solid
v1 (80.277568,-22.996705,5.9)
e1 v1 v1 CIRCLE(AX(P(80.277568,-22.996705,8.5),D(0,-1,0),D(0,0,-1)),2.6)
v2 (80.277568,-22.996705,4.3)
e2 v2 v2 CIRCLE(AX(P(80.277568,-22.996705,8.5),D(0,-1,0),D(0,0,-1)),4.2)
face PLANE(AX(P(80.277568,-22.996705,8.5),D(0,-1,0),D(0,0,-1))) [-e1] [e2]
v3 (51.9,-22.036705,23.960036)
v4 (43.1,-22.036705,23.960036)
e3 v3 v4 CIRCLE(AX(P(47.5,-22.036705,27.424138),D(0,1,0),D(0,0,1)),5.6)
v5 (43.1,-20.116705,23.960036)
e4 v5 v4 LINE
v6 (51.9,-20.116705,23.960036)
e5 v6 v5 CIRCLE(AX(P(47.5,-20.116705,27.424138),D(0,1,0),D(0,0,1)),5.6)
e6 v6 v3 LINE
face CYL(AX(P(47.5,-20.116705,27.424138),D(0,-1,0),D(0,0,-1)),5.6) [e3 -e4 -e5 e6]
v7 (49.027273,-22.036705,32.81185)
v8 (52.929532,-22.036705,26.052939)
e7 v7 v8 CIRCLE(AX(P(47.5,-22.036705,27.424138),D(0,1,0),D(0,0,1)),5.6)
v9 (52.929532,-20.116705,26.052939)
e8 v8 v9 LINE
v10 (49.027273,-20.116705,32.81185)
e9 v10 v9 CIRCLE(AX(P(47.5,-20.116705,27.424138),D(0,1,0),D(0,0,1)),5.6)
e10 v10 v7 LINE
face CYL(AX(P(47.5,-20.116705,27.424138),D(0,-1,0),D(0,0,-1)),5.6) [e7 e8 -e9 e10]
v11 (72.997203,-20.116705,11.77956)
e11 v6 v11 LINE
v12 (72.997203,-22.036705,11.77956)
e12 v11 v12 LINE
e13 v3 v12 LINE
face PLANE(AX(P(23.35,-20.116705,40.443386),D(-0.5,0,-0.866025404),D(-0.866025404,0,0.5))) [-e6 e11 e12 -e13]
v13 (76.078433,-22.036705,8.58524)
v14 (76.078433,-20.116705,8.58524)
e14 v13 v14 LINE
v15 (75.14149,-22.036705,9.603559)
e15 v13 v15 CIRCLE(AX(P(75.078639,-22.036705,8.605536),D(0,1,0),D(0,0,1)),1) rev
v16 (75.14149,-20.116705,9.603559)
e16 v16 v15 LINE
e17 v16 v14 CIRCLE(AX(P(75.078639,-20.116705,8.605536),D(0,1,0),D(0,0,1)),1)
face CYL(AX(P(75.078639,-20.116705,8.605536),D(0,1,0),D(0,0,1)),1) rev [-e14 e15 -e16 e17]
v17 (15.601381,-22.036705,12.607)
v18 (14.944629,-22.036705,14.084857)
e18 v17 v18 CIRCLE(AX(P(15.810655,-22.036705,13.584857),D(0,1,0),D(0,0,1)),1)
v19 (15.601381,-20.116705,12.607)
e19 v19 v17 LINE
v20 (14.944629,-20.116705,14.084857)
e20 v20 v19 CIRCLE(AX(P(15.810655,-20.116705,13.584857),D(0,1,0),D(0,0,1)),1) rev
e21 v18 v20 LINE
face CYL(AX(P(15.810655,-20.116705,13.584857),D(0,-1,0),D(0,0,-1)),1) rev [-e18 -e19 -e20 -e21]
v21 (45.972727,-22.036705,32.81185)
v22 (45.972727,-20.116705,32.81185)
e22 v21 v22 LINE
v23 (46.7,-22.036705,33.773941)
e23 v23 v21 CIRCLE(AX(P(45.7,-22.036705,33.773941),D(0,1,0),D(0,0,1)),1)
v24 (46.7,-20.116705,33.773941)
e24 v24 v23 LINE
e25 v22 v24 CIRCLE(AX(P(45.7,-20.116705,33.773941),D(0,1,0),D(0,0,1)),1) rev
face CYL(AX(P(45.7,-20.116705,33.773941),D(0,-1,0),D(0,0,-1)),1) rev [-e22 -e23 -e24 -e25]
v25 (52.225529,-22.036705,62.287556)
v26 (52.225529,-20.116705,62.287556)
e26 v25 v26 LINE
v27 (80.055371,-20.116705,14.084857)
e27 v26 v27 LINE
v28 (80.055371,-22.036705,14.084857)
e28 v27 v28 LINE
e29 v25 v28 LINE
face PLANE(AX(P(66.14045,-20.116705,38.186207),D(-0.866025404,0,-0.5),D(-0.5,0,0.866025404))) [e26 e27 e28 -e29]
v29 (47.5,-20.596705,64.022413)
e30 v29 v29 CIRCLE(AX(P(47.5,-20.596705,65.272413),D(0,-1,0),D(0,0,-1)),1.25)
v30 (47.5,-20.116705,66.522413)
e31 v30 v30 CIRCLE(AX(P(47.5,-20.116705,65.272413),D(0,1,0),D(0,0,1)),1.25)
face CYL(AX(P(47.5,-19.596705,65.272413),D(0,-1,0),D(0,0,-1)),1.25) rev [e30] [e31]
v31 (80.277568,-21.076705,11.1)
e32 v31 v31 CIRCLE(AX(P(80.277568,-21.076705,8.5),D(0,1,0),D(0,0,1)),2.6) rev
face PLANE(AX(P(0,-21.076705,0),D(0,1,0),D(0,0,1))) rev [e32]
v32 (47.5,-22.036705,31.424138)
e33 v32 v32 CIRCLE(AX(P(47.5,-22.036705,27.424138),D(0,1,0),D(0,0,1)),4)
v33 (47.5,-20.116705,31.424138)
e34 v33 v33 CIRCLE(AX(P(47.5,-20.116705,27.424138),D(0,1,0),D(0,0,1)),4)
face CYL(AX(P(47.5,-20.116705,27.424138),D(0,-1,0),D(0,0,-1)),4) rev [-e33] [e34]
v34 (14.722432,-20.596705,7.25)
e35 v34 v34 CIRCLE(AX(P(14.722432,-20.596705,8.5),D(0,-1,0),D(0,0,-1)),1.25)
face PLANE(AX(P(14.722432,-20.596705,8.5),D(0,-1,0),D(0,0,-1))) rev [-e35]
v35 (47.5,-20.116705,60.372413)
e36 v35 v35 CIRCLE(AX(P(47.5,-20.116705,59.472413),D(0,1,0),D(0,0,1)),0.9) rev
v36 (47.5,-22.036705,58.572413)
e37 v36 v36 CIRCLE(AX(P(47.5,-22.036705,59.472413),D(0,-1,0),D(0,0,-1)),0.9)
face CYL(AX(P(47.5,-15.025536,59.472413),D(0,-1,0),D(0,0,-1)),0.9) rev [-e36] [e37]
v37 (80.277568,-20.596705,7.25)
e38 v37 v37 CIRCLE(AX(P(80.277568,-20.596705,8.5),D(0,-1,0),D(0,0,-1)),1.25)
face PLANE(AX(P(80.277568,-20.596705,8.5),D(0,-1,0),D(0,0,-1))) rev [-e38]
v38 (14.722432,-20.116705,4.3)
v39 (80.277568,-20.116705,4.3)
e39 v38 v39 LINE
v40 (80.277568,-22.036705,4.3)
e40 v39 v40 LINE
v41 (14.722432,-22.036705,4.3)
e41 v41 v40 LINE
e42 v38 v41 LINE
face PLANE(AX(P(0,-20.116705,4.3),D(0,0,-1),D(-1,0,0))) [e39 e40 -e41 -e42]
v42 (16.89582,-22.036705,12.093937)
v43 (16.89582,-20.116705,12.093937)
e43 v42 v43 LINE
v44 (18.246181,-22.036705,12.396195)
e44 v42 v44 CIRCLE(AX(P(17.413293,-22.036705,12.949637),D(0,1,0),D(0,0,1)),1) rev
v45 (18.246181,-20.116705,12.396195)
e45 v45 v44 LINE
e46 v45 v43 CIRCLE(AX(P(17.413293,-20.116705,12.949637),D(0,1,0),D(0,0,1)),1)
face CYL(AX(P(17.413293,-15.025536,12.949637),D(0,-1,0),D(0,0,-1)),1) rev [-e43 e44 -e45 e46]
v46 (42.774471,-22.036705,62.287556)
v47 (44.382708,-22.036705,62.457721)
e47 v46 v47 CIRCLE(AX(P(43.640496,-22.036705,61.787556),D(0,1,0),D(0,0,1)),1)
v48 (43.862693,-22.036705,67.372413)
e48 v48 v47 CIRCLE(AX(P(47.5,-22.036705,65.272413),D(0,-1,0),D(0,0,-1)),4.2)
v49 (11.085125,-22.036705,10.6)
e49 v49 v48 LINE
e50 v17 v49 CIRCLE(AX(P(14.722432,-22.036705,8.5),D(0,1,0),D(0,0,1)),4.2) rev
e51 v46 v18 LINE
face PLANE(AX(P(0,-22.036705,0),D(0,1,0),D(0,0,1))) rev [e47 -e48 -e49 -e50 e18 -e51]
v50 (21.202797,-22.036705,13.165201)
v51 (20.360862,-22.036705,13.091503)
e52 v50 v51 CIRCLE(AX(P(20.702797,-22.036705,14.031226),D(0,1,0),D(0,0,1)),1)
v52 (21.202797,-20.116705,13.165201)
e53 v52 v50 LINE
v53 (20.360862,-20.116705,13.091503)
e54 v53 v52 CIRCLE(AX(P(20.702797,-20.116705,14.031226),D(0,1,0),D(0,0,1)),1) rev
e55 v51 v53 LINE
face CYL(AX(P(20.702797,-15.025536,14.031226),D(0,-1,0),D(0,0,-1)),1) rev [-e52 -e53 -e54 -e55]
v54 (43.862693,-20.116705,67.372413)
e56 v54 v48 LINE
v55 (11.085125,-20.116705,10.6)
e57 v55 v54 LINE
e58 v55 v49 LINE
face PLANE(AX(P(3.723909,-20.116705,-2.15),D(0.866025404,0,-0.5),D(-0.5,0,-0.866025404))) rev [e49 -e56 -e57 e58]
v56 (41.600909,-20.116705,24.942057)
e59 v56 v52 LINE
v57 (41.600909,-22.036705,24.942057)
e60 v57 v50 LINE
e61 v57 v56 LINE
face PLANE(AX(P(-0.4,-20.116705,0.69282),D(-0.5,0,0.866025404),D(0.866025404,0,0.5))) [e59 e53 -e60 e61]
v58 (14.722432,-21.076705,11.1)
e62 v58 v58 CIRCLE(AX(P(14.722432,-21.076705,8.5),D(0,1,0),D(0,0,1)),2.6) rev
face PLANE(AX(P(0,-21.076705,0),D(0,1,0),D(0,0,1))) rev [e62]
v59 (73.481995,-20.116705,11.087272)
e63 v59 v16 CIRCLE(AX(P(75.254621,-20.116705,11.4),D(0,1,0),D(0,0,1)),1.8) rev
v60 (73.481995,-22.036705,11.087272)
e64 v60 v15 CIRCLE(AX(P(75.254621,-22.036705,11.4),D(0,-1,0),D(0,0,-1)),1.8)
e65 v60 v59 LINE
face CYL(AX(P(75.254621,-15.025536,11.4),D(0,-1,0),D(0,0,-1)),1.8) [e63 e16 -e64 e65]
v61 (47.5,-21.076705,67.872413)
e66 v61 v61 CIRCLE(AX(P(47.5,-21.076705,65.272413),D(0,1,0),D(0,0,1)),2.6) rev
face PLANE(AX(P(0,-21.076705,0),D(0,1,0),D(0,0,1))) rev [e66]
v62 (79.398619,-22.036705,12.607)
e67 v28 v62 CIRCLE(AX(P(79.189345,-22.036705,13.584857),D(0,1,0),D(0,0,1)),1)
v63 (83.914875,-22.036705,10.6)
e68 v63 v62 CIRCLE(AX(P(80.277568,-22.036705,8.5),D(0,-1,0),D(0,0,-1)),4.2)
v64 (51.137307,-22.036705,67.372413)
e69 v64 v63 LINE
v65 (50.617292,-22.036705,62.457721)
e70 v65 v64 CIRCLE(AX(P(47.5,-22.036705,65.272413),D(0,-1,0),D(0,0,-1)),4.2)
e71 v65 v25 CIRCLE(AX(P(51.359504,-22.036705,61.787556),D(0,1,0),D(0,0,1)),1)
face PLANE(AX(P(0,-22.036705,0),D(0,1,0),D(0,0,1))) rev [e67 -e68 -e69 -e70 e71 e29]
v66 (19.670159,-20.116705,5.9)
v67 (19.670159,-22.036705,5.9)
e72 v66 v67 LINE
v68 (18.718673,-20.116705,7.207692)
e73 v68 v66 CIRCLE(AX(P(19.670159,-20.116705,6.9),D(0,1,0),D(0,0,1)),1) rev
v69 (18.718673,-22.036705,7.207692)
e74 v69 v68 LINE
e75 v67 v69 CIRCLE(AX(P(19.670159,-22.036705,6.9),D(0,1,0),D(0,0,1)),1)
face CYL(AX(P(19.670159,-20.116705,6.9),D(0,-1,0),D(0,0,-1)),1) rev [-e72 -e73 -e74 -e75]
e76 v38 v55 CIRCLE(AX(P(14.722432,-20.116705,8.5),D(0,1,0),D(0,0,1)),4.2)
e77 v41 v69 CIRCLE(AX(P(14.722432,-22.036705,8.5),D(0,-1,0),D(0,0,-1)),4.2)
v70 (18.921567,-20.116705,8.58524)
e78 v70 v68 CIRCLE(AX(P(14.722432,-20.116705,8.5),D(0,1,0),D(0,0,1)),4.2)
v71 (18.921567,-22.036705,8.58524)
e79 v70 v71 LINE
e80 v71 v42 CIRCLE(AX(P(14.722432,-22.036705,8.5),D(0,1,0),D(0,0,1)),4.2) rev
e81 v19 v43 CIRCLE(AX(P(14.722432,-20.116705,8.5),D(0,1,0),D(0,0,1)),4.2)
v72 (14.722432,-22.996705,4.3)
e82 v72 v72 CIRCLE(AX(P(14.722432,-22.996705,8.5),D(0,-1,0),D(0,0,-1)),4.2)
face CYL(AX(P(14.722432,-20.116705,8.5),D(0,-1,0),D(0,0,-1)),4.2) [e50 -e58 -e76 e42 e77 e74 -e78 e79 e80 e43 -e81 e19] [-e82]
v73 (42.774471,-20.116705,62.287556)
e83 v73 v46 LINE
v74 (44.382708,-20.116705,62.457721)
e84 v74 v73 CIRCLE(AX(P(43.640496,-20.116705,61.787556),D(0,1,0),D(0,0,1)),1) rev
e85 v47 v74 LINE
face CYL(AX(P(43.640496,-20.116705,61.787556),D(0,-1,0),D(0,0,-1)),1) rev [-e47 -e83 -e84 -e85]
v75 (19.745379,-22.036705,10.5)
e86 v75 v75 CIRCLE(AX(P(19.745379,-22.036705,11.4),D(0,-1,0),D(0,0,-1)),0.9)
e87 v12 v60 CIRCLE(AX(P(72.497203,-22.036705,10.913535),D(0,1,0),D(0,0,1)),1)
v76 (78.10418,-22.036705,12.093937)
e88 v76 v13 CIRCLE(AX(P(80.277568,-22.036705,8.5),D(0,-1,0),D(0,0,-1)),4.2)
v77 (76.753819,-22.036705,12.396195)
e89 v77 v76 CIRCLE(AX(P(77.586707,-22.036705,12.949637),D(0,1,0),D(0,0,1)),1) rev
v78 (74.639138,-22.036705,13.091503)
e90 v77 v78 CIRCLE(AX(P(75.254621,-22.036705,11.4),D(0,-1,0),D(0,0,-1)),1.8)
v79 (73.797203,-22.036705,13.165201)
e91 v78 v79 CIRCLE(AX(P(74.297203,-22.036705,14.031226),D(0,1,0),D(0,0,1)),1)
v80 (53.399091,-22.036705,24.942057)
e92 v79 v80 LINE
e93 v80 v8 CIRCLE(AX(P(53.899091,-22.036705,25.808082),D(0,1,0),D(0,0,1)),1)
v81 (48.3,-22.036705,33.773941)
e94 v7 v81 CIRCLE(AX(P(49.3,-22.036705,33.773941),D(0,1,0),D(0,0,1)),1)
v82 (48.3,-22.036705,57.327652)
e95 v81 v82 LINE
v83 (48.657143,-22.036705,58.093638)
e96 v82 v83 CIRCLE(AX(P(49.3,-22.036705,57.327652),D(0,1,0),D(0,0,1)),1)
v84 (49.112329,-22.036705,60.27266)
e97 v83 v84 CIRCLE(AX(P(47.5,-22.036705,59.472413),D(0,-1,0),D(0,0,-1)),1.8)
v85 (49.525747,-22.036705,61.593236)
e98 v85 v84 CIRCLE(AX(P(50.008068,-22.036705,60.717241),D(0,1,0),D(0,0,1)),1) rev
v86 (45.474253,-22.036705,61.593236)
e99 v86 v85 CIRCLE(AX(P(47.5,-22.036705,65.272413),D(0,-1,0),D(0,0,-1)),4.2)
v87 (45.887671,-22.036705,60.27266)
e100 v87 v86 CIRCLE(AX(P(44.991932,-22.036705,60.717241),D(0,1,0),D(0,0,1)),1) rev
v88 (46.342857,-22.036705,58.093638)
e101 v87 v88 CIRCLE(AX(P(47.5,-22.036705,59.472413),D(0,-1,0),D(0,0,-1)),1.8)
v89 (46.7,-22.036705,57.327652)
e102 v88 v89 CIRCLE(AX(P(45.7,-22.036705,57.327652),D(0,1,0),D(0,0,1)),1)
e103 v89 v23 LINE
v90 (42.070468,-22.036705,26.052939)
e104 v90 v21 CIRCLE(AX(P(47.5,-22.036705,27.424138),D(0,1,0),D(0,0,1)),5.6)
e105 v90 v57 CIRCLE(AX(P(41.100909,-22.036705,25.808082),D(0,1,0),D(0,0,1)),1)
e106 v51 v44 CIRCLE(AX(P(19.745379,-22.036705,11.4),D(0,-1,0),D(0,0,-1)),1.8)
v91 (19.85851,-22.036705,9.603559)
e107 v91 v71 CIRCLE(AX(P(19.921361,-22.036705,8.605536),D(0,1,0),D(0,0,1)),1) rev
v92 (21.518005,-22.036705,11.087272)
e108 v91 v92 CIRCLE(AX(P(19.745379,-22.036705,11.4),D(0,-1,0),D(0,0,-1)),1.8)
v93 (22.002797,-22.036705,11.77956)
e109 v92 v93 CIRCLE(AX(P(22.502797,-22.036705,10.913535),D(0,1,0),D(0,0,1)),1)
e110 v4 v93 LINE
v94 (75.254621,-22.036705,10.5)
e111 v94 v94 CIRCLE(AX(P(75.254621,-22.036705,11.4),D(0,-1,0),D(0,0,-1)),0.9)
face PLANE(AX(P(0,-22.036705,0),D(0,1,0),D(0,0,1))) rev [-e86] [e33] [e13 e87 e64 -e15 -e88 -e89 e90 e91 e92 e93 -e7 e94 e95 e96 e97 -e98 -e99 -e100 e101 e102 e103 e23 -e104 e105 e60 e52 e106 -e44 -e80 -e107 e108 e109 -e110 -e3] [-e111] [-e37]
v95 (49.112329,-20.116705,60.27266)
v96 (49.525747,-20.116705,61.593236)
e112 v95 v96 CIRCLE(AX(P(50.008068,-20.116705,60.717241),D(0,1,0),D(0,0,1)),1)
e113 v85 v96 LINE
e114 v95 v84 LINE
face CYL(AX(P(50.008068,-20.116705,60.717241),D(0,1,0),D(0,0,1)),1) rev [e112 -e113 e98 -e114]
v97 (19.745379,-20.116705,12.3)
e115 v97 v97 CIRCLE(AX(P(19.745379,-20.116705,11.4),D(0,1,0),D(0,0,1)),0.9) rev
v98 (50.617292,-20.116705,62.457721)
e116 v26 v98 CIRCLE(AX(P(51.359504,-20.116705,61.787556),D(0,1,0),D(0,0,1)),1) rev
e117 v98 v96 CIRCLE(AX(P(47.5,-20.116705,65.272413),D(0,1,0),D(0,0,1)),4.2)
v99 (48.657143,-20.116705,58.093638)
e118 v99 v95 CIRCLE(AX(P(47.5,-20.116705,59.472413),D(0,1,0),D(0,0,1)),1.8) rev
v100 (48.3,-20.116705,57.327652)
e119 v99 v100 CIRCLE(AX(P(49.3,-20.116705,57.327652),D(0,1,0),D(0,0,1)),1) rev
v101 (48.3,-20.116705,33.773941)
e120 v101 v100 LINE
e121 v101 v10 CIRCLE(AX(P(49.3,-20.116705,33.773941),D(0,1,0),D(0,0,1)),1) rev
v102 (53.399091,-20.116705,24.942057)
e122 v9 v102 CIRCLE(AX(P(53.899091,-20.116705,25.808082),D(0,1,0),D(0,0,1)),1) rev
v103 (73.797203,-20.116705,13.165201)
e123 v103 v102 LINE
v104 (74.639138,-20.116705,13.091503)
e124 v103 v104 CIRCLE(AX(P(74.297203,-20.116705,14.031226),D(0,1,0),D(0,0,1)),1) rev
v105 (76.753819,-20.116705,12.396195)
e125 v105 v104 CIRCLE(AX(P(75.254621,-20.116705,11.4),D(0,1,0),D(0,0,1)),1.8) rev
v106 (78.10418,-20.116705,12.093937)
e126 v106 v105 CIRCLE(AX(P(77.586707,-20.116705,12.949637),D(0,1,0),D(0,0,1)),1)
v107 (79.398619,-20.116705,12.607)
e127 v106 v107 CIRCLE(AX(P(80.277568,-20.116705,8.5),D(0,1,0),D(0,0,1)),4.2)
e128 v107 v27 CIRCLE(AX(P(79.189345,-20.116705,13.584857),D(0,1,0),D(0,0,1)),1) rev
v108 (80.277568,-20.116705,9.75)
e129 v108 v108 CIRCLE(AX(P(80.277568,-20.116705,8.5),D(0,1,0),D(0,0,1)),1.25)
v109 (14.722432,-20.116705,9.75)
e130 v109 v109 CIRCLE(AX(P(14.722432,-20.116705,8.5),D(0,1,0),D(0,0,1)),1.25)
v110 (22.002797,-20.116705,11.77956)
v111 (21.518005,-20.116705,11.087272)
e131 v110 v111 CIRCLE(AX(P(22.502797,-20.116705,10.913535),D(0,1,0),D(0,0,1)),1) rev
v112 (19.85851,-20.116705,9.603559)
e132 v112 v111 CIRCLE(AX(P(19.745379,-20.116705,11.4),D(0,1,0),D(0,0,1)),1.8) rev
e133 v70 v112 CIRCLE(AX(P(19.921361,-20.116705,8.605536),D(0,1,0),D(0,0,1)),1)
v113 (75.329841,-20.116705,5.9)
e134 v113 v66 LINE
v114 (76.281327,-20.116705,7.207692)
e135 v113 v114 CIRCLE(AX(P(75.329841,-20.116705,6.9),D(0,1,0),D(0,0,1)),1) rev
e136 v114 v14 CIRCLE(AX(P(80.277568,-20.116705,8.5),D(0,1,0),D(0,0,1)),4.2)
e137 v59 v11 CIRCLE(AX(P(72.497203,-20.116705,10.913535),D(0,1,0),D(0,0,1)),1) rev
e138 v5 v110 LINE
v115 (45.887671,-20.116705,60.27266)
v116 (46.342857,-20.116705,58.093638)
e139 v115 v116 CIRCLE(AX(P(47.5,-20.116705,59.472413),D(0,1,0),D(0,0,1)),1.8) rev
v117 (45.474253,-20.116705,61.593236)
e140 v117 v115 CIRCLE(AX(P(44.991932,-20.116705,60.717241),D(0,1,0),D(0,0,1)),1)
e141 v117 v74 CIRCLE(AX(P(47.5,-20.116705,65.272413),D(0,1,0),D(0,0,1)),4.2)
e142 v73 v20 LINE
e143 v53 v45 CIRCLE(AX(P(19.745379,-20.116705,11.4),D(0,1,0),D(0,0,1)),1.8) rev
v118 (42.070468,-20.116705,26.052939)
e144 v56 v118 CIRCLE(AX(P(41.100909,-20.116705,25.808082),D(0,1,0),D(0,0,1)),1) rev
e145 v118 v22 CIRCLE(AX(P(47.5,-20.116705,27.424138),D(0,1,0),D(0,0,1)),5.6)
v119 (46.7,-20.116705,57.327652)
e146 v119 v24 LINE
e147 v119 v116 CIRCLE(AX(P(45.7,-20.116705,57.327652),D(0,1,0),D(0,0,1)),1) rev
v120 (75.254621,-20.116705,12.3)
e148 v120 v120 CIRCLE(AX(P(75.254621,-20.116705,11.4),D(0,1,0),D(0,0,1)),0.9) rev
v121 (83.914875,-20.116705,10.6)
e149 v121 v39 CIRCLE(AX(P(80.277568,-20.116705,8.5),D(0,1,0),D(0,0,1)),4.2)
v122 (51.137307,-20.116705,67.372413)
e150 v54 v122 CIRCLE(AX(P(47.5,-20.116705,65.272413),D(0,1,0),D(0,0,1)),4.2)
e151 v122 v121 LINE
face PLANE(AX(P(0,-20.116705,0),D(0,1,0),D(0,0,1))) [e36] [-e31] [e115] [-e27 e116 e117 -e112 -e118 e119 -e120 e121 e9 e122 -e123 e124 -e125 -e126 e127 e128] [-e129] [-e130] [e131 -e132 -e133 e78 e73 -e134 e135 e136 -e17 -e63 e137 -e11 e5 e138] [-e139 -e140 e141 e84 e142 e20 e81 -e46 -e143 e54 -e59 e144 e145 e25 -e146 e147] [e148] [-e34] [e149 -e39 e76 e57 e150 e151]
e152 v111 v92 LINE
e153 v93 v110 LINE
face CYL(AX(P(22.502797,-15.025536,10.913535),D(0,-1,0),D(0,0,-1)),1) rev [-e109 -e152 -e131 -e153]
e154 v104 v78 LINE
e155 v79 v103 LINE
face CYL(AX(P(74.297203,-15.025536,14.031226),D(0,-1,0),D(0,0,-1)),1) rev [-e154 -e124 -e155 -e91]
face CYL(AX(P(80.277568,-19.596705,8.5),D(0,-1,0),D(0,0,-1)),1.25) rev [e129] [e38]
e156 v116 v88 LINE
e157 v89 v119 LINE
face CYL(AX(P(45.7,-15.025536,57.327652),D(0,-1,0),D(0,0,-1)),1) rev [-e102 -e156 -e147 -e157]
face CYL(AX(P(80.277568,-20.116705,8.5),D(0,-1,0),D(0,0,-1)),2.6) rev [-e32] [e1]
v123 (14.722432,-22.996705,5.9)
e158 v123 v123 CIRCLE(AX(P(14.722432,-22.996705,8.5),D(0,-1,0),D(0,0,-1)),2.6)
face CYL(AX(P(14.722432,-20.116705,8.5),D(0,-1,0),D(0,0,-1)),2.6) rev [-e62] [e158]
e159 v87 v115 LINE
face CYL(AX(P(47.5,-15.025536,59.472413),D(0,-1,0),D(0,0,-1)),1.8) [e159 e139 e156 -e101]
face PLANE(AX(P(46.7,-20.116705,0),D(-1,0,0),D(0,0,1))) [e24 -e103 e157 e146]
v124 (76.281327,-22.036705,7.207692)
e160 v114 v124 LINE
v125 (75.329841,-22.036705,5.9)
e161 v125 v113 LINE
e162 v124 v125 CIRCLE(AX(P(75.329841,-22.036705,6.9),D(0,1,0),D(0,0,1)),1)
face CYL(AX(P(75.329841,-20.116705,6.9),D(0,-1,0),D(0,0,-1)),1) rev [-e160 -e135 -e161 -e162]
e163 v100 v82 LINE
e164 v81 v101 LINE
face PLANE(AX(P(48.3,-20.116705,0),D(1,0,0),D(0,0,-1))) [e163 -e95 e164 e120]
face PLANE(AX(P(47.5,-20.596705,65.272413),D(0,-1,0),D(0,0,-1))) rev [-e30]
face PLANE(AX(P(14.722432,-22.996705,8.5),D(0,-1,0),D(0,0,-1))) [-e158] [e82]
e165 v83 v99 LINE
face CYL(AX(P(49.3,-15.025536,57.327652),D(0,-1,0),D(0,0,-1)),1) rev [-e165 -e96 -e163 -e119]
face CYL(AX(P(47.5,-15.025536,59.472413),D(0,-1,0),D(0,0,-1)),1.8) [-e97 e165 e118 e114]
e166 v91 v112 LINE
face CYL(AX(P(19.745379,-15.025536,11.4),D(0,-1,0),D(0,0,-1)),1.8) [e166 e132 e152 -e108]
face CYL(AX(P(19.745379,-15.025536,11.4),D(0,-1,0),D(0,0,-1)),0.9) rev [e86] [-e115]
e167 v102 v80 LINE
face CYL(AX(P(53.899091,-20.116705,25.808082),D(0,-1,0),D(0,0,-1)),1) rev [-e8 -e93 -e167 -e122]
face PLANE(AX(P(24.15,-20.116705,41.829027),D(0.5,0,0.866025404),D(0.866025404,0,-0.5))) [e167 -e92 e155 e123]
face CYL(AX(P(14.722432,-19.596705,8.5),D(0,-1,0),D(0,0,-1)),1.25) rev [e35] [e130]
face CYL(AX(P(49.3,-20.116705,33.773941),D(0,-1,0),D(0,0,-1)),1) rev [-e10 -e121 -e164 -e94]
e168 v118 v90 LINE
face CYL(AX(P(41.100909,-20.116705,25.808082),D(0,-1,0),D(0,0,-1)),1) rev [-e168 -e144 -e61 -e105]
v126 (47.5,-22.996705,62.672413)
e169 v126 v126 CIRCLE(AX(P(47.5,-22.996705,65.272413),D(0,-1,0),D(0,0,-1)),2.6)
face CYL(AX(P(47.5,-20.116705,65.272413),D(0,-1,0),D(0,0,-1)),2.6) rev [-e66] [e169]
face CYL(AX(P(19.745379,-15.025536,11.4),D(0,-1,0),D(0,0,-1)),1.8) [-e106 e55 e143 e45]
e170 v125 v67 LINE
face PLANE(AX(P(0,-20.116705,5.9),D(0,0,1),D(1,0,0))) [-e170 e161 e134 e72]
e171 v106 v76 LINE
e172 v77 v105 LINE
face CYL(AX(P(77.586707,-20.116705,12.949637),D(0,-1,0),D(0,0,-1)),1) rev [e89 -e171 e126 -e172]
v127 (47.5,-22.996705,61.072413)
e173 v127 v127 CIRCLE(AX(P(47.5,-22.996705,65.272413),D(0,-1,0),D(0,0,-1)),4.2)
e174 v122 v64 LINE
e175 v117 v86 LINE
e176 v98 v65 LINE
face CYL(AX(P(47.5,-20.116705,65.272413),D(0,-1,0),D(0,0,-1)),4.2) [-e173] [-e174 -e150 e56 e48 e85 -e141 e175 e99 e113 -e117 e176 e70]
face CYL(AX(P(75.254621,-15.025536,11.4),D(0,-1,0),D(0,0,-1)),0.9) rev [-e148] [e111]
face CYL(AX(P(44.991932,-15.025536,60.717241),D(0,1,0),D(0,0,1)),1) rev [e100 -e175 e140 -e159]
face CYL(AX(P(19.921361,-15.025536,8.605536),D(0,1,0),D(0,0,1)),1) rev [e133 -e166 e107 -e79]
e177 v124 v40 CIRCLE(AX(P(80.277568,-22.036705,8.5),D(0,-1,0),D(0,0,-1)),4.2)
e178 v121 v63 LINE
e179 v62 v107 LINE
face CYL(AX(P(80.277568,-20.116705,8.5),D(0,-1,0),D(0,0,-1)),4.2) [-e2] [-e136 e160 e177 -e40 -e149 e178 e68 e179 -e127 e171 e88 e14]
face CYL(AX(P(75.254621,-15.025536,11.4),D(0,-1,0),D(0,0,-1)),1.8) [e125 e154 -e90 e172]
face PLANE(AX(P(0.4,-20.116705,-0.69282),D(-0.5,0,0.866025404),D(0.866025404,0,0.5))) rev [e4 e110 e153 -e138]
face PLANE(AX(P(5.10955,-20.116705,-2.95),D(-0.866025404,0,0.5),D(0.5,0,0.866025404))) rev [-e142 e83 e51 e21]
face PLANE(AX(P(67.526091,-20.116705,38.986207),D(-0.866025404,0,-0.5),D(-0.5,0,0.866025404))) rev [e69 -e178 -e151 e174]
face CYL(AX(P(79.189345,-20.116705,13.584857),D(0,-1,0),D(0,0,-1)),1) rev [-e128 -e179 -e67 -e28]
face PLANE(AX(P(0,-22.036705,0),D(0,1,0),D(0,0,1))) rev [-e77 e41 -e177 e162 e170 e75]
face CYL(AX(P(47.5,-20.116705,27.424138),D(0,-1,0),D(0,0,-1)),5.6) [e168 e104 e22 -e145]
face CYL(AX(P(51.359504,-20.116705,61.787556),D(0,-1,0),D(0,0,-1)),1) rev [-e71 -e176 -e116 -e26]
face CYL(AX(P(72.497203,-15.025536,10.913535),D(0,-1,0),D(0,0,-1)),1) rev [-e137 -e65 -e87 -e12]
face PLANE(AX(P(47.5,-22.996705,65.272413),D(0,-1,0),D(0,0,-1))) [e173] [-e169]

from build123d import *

# Parameters (mm, degrees)
SKETCH6_R           = 2.6
SKETCH6_R_2         = 4
BOSS_EXTRUDE4_DEPTH = 1.92
BOSS_EXTRUDE5_START = -0.96
SKETCH7_R           = 2.6
BOSS_EXTRUDE5_DEPTH = 0.96
BOSS_EXTRUDE6_START = 0.96
SKETCH8_R           = 4.2
SKETCH8_R_2         = 2.6
BOSS_EXTRUDE6_DEPTH = 0.96
CUT_EXTRUDE1_START  = -0.48
SKETCH9_R           = 1.25
CUT_EXTRUDE1_DEPTH  = 1
SKETCH15_R          = 1.8
SKETCH15_R_2        = 0.9
BOSS_EXTRUDE9_DEPTH = 1.92
SKETCH16_R          = 0.9
CUT_EXTRUDE2_DEPTH  = 110.391782763
FILLET4_R           = 1
FILLET5_R           = 1
FILLET6_R           = 1
FILLET7_R           = 1
FILLET8_R           = 1
FILLET9_R           = 1
FILLET10_R          = 1


with BuildPart() as part:
    # Sketch6 → Boss-Extrude4 (new body)
    with BuildSketch(Plane(origin=(6.205374015, -22.036704958, -3.582674358), x_dir=(-0.6546536707079775, 0, -0.7559289460184543), z_dir=(0, 1, 0))):
        with BuildLine():
            Line((-13.915641084, 5.595994683), (-78.289506975, 17.98475095))
            ThreePointArc((-78.289506975, 17.98475095), (-82.258133941, 16.609978241), (-83.051859334, 12.485660116))
            Line((-83.051859334, 12.485660116), (-61.593904038, -49.458121219))
            ThreePointArc((-61.593904038, -49.458121219), (-58.419002464, -52.207666636), (-54.450375498, -50.832893927))
            Line((-54.450375498, -50.832893927), (-11.534464904, -1.27786886))
            ThreePointArc((-11.534464904, -1.27786886), (-10.740739511, 2.846449266), (-13.915641084, 5.595994683))
        make_face()
        with BuildLine():
            Line((-61.161728639, -45.817623392), (-80.460318949, 9.892608162))
            ThreePointArc((-80.460318949, 9.892608162), (-78.390537961, 9.717948731), (-76.490180415, 10.556483435))
            Line((-76.490180415, 10.556483435), (-55.186131734, -7.893363926))
            ThreePointArc((-55.186131734, -7.893363926), (-55.764127927, -12.750109988), (-52.305655583, -16.208582332))
            Line((-52.305655583, -16.208582332), (-57.631667753, -43.883353372))
            ThreePointArc((-57.631667753, -43.883353372), (-59.643514651, -44.400046042), (-61.161728639, -45.817623392))
        make_face(mode=Mode.SUBTRACT)
        with BuildLine():
            Line((-54.138685861, -6.683877612), (-75.442734541, 11.765969748))
            ThreePointArc((-75.442734541, 11.765969748), (-74.884280071, 13.766626605), (-75.352831074, 15.790227162))
            Line((-75.352831074, 15.790227162), (-17.457060141, 4.648180851))
            ThreePointArc((-17.457060141, 4.648180851), (-18.64321014, 2.943027651), (-18.867196558, 0.878002387))
            Line((-18.867196558, 0.878002387), (-45.497257408, -8.346921293))
            ThreePointArc((-45.497257408, -8.346921293), (-49.414324781, -5.417988876), (-54.138685861, -6.683877612))
        make_face(mode=Mode.SUBTRACT)
        with BuildLine():
            ThreePointArc((-18.343473621, -0.633855505), (-16.890081194, -2.117819692), (-14.903316204, -2.723842899))
            Line((-14.903316204, -2.723842899), (-53.500496825, -47.292028142))
            ThreePointArc((-53.500496825, -47.292028142), (-54.384127815, -45.412215511), (-56.060498944, -44.185724951))
            Line((-56.060498944, -44.185724951), (-50.734486774, -16.51095391))
            ThreePointArc((-50.734486774, -16.51095391), (-46.239423208, -14.583140266), (-44.973534471, -9.858779185))
            Line((-44.973534471, -9.858779185), (-18.343473621, -0.633855505))
        make_face(mode=Mode.SUBTRACT)
        with Locations(Location((-79.083232368, 13.860432824, 0), (0, 0, 139.106605351))):
            Circle(SKETCH6_R, mode=Mode.SUBTRACT)
        with Locations(Location((-57.625277071, -48.08334851, 0), (0, 0, 139.106605351))):
            Circle(SKETCH6_R, mode=Mode.SUBTRACT)
        with Locations(Location((-14.709366477, 1.471676557, 0), (0, 0, 139.106605351))):
            Circle(SKETCH6_R, mode=Mode.SUBTRACT)
        with Locations(Location((-50.472625305, -10.91707971, 0), (0, 0, 139.106605351))):
            Circle(SKETCH6_R_2, mode=Mode.SUBTRACT)
    extrude(amount=BOSS_EXTRUDE4_DEPTH)

    # Sketch7 → Boss-Extrude5 (add)
    with BuildSketch(Plane(origin=(0, -20.116704958, 0), x_dir=(1, 0, 0), z_dir=(0, 1, 0)).offset(BOSS_EXTRUDE5_START)):
        with Locations(Location((47.5, -65.27241336, 0), (0, 0, 270))):
            Circle(SKETCH7_R)
        with Locations(Location((14.722431864, -8.5, 0), (0, 0, 270))):
            Circle(SKETCH7_R)
        with Locations(Location((80.277568136, -8.5, 0), (0, 0, 270))):
            Circle(SKETCH7_R)
    extrude(amount=BOSS_EXTRUDE5_DEPTH)

    # Sketch8 → Boss-Extrude6 (add)
    # profile 1 of 3: a face of its own
    with BuildSketch(Plane.XZ.offset(22.036704958).offset(BOSS_EXTRUDE6_START)):
        with Locations(Location((47.5, 65.27241336, 0), (0, 0, 270))):
            Circle(SKETCH8_R)
        with Locations(Location((47.5, 65.27241336, 0), (0, 0, 270))):
            Circle(SKETCH8_R_2, mode=Mode.SUBTRACT)
    # profile 2 of 3: a face of its own
    with BuildSketch(Plane.XZ.offset(22.036704958).offset(BOSS_EXTRUDE6_START)):
        with Locations(Location((80.277568136, 8.5, 0), (0, 0, 270))):
            Circle(SKETCH8_R)
        with Locations(Location((80.277568136, 8.5, 0), (0, 0, 270))):
            Circle(SKETCH8_R_2, mode=Mode.SUBTRACT)
    # profile 3 of 3: a face of its own
    with BuildSketch(Plane.XZ.offset(22.036704958).offset(BOSS_EXTRUDE6_START)):
        with Locations(Location((14.722431864, 8.5, 0), (0, 0, 270))):
            Circle(SKETCH8_R)
        with Locations(Location((14.722431864, 8.5, 0), (0, 0, 270))):
            Circle(SKETCH8_R_2, mode=Mode.SUBTRACT)
    extrude(amount=-BOSS_EXTRUDE6_DEPTH)

    # Sketch9 → Cut-Extrude1 (cut)
    with BuildSketch(Plane.XZ.offset(21.076704958).offset(CUT_EXTRUDE1_START)):
        with Locations(Location((14.722431864, 8.5, 0), (0, 0, 270))):
            Circle(SKETCH9_R)
        with Locations(Location((47.5, 65.27241336, 0), (0, 0, 270))):
            Circle(SKETCH9_R)
        with Locations(Location((80.277568136, 8.5, 0), (0, 0, 270))):
            Circle(SKETCH9_R)
    extrude(amount=-CUT_EXTRUDE1_DEPTH, mode=Mode.SUBTRACT)

    # Sketch15 → Boss-Extrude9 (add)
    # profile 1 of 3: a face of its own
    with BuildSketch(Plane.XZ.offset(22.036704958)):
        with Locations((19.745379206, 11.4)):
            Circle(SKETCH15_R)
        with Locations((19.745379206, 11.4)):
            Circle(SKETCH15_R_2, mode=Mode.SUBTRACT)
    # profile 2 of 3: a face of its own
    with BuildSketch(Plane.XZ.offset(22.036704958)):
        with Locations((47.5, 59.47241336)):
            Circle(SKETCH15_R)
        with Locations((47.5, 59.47241336)):
            Circle(SKETCH15_R_2, mode=Mode.SUBTRACT)
    # profile 3 of 3: a face of its own
    with BuildSketch(Plane.XZ.offset(22.036704958)):
        with Locations((75.254620794, 11.4)):
            Circle(SKETCH15_R)
        with Locations((75.254620794, 11.4)):
            Circle(SKETCH15_R_2, mode=Mode.SUBTRACT)
    extrude(amount=-BOSS_EXTRUDE9_DEPTH)

    # Sketch16 → Cut-Extrude2 (cut, through all)
    with BuildSketch(Plane.XZ.offset(22.036704958)):
        with Locations(Location((19.745379206, 11.4, 0), (0, 0, 270))):
            Circle(SKETCH16_R)
        with Locations(Location((47.5, 59.47241336, 0), (0, 0, 270))):
            Circle(SKETCH16_R)
        with Locations(Location((75.254620794, 11.4, 0), (0, 0, 270))):
            Circle(SKETCH16_R)
    extrude(amount=-CUT_EXTRUDE2_DEPTH, mode=Mode.SUBTRACT)

    # Fillet4
    # the kernel refuses this fillet: 1 mm, written as the material it adds along each edge
    with BuildSketch(Plane(origin=(46.7, -20.116704958, 57.85996181), x_dir=(-0.8367977565888843, 0, 0.5475121136265482), z_dir=(0, -1, 0)), Plane(origin=(21.541803211, -20.116704958, 11.513405452), x_dir=(-0.05576052098568756, 0, -0.9984441718490847), z_dir=(0, -1, 0)), Plane(origin=(74.258196789, -20.116704958, 12.899046098), x_dir=(0.8925582775748443, 0, 0.45093205822233046), z_dir=(0, -1, 0))) as fillet4_piece_1:
        with BuildLine():
            CenterArc((0.545351852, 0.992947517), FILLET4_R, 213.196500423, 49.994799115)
            Line((-0.291445905, 0.445435403), (0, 0))
            ThreePointArc((0, 0), (0.213398551, 0.01269447), (0.426797102, 0))
        make_face()
    extrude(amount=1.92)
    with BuildSketch(Plane(origin=(48.3, -20.116704958, 57.85996181), x_dir=(0.8367977565890745, 0, 0.5475121136262574), z_dir=(0, -1, 0)), Plane(origin=(20.741803211, -20.116704958, 12.899046098), x_dir=(-0.8925582775746639, 0, 0.4509320582226875), z_dir=(0, -1, 0)), Plane(origin=(73.458196789, -20.116704958, 11.513405452), x_dir=(0.055760520985286104, 0, -0.9984441718491072), z_dir=(0, -1, 0))) as fillet4_piece_2:
        with BuildLine():
            CenterArc((0.545351852, -0.992947517), FILLET4_R, 96.808700462, 49.994799115)
            Line((-0.291445905, -0.445435403), (0, 0))
            ThreePointArc((0, 0), (0.213398551, -0.01269447), (0.426797102, 0))
        make_face()
    extrude(amount=1.92)
    with BuildSketch(Plane(origin=(48.3, -22.036704958, 32.966700371), x_dir=(0, 0, 1), z_dir=(0, 1, 0)), Plane(origin=(42.3, -22.036704958, 25.345676817), x_dir=(-0.8660254037844427, 0, -0.4999999999999931), z_dir=(0, 1, 0))) as fillet4_piece_3:
        with BuildLine():
            CenterArc((0.807240562, 1), FILLET4_R, 195.826620132, 74.173379868)
            ThreePointArc((-0.154850824, 0.727272727), (-0.065341051, 0.366209364), (0, 0))
            Line((0, 0), (0.807240562, 0))
        make_face()
    extrude(amount=1.92)
    with BuildSketch(Plane(origin=(51.4009083, -22.036704958, 63.715841988), x_dir=(-0.5286840359966489, 0, -0.8488187027170727), z_dir=(0, 1, 0)), Plane(origin=(76.979083635, -22.036704958, 5.9), x_dir=(-0.47075654176194004, 0, 0.8822631571069591), z_dir=(0, 1, 0))) as fillet4_piece_4:
        with BuildLine():
            CenterArc((1.658654735, -0.984309133), FILLET4_R, 100.163203369, 107.920213139)
            Line((0.776391578, -1.455065675), (0, 0))
            ThreePointArc((0, 0), (0.741101052, -0.065901642), (1.482202104, 0))
        make_face()
    extrude(amount=1.92)
    with BuildSketch(Plane(origin=(80.879991935, -22.036704958, 12.656571371), x_dir=(-0.5000000000000111, 0, 0.8660254037844322), z_dir=(0, 1, 0)), Plane(origin=(43.5990917, -22.036704958, 63.715841988), x_dir=(-0.5000000000000028, 0, -0.8660254037844369), z_dir=(0, 1, 0)), Plane(origin=(18.020916365, -22.036704958, 5.9), x_dir=(1, 0, 0), z_dir=(0, 1, 0))) as fillet4_piece_5:
        with BuildLine():
            CenterArc((1.64924225, -1), FILLET4_R, 90, 107.920213139)
            ThreePointArc((0.697756337, -1.307692308), (0.407020759, -0.622822525), (0, 0))
            Line((0, 0), (1.64924225, 0))
        make_face()
    extrude(amount=1.92)
    with BuildSketch(Plane(origin=(52.7, -22.036704958, 25.345676817), x_dir=(0.8660254037844392, 0, -0.49999999999999917), z_dir=(0, 1, 0)), Plane(origin=(46.7, -22.036704958, 32.966700371), x_dir=(0, 0, 1), z_dir=(0, 1, 0))) as fillet4_piece_6:
        with BuildLine():
            CenterArc((0.807240562, -1), FILLET4_R, 90, 74.173379868)
            ThreePointArc((-0.154850824, -0.727272727), (-0.065341051, -0.366209364), (0, 0))
            Line((0, 0), (0.807240562, 0))
        make_face()
    extrude(amount=1.92)
    with BuildSketch(Plane(origin=(14.120008065, -22.036704958, 12.656571371), x_dir=(0.499999999999999, 0, 0.8660254037844392), z_dir=(0, 1, 0))) as fillet4_piece_7:
        with BuildLine():
            CenterArc((1.64924225, 1), FILLET4_R, 162.079786861, 107.920213139)
            ThreePointArc((0.697756337, 1.307692308), (0.407020759, 0.622822525), (0, 0))
            Line((0, 0), (1.64924225, 0))
        make_face()
    extrude(amount=1.92)

    # Fillet5
    # the kernel refuses this fillet: 1 mm, written as the material it adds along each edge
    with BuildSketch(Plane(origin=(17.948955202, -20.116704958, 11.286594548), x_dir=(-0.7936286063896545, 0, 0.6084025272136984), z_dir=(0, -1, 0))) as fillet5_piece_1:
        with BuildLine():
            CenterArc((1.436915896, -0.993939548), FILLET5_R, 96.311167786, 87.559469258)
            Line((0.439196892, -1.061443536), (0.339424992, -1.068193935))
            ThreePointArc((0.339424992, -1.068193935), (0.214142343, -0.532979357), (-0.075372073, -0.065719484))
            Line((-0.075372073, -0.065719484), (-0.092370635, 0.038310127))
            ThreePointArc((-0.092370635, 0.038310127), (0.04470246, 0.157502909), (1.315995045, 0.099393955))
            Line((1.315995045, 0.099393955), (1.32698785, 0))
        make_face()
    extrude(amount=1.92)
    with BuildSketch(Plane(origin=(17.893146079, -22.036704958, 11.254373136), x_dir=(-0.7650206510396939, 0, 0.6440057480200025), z_dir=(0, 1, 0))) as fillet5_piece_2:
        with BuildLine():
            CenterArc((1.458856994, 0.987883455), FILLET5_R, 173.512276912, 87.559469258)
            Line((0.465260905, 1.100873771), (0.365901296, 1.112172802))
            ThreePointArc((0.365901296, 1.112172802), (-0.094237007, 0.129683936), (-0.094023566, -0.034052444))
            Line((-0.094023566, -0.034052444), (0.015519755, -0.098788345))
            ThreePointArc((0.015519755, -0.098788345), (0.651829721, -0.049110509), (1.288139686, -0.098788345))
            Line((1.288139686, -0.098788345), (1.303659442, 0))
        make_face()
    extrude(amount=1.92)

    # Fillet6
    # the kernel refuses this fillet: 1 mm, written as the material it adds along each edge
    with BuildSketch(Plane(origin=(18.748955202, -20.116704958, 9.900953902), x_dir=(0.9659060551414003, 0, -0.25889282076021003), z_dir=(0, -1, 0))) as fillet6_piece_1:
        with BuildLine():
            CenterArc((1.467808139, -0.947724847), FILLET6_R, 108.607823847, 87.559469258)
            Line((0.50735535, -1.22616773), (0.411310071, -1.254012019))
            ThreePointArc((0.411310071, -1.254012019), (-0.128444999, -0.101525163), (-0.070716079, 0.070705277))
            Line((-0.070716079, 0.070705277), (0.031908873, 0.094772485))
            ThreePointArc((0.031908873, 0.094772485), (0.574359707, 0.005904724), (1.116810541, 0.094772485))
            Line((1.116810541, 0.094772485), (1.148719413, 0))
        make_face()
    extrude(amount=1.92)
    with BuildSketch(Plane(origin=(18.693146079, -22.036704958, 9.86873249), x_dir=(0.17521501244867502, 0, -0.9845301922300863), z_dir=(0, 1, 0))) as fillet6_piece_2:
        with BuildLine():
            CenterArc((1.458856994, -0.987883455), FILLET6_R, 98.92825383, 87.559469258)
            Line((0.465260905, -1.100873771), (0.365901296, -1.112172802))
            ThreePointArc((0.365901296, -1.112172802), (-0.094237007, -0.129683936), (-0.094023566, 0.034052444))
            Line((-0.094023566, 0.034052444), (0.015519755, 0.098788345))
            ThreePointArc((0.015519755, 0.098788345), (0.651829721, 0.049110509), (1.288139686, 0.098788345))
            Line((1.288139686, 0.098788345), (1.303659442, 0))
        make_face()
    extrude(amount=1.92)

    # Fillet7
    # the kernel refuses this fillet: 1 mm, written as the material it adds along each edge
    with BuildSketch(Plane(origin=(76.251044798, -20.116704958, 9.900953902), x_dir=(-0.9659060551413163, 0, -0.258892820760523), z_dir=(0, -1, 0))) as fillet7_piece_1:
        with BuildLine():
            CenterArc((1.467808139, 0.947724847), FILLET7_R, 163.832706895, 87.559469258)
            Line((0.50735535, 1.22616773), (0.411310071, 1.254012019))
            ThreePointArc((0.411310071, 1.254012019), (-0.128444999, 0.101525163), (-0.070716079, -0.070705277))
            Line((-0.070716079, -0.070705277), (0.031908873, -0.094772485))
            ThreePointArc((0.031908873, -0.094772485), (0.574359707, -0.005904724), (1.116810541, -0.094772485))
            Line((1.116810541, -0.094772485), (1.148719413, 0))
        make_face()
    extrude(amount=1.92)
    with BuildSketch(Plane(origin=(76.306853921, -22.036704958, 9.86873249), x_dir=(-0.9750752661926074, 0, -0.22187434565405648), z_dir=(0, 1, 0))) as fillet7_piece_2:
        with BuildLine():
            CenterArc((1.47787276, -0.959202562), FILLET7_R, 106.422593877, 87.559469258)
            Line((0.507501346, -1.200820688), (0.410464204, -1.2249825))
            ThreePointArc((0.410464204, -1.2249825), (0.208514231, -0.619528565), (-0.084953776, -0.052752781))
            Line((-0.084953776, -0.052752781), (-0.067968645, 0.073350278))
            ThreePointArc((-0.067968645, 0.073350278), (0.082768354, 0.137287787), (1.166881058, 0.095920256))
            Line((1.166881058, 0.095920256), (1.195153031, 0))
        make_face()
    extrude(amount=1.92)

    # Fillet8
    # the kernel refuses this fillet: 1 mm, written as the material it adds along each edge
    with BuildSketch(Plane(origin=(77.051044798, -20.116704958, 11.286594548), x_dir=(-0.25874526793525154, 0, 0.9659455918016887), z_dir=(0, -1, 0))) as fillet8_piece_1:
        with BuildLine():
            CenterArc((1.467808139, -0.947724847), FILLET8_R, 108.607823847, 87.559469258)
            Line((0.50735535, -1.22616773), (0.411310071, -1.254012019))
            ThreePointArc((0.411310071, -1.254012019), (-0.128444999, -0.101525163), (-0.070716079, 0.070705277))
            Line((-0.070716079, 0.070705277), (0.031908873, 0.094772485))
            ThreePointArc((0.031908873, 0.094772485), (0.574359707, 0.005904724), (1.116810541, 0.094772485))
            Line((1.116810541, 0.094772485), (1.148719413, 0))
        make_face()
    extrude(amount=1.92)
    with BuildSketch(Plane(origin=(77.106853921, -22.036704958, 11.254373136), x_dir=(0.7650206510396409, 0, 0.6440057480200654), z_dir=(0, 1, 0))) as fillet8_piece_2:
        with BuildLine():
            CenterArc((1.458856994, -0.987883455), FILLET8_R, 98.92825383, 87.559469258)
            Line((0.465260905, -1.100873771), (0.365901296, -1.112172802))
            ThreePointArc((0.365901296, -1.112172802), (-0.094237007, -0.129683936), (-0.094023566, 0.034052444))
            Line((-0.094023566, 0.034052444), (0.015519755, 0.098788345))
            ThreePointArc((0.015519755, 0.098788345), (0.651829721, 0.049110509), (1.288139686, 0.098788345))
            Line((1.288139686, 0.098788345), (1.303659442, 0))
        make_face()
    extrude(amount=1.92)

    # Fillet9
    # the kernel refuses this fillet: 1 mm, written as the material it adds along each edge
    with BuildSketch(Plane(origin=(48.3, -20.116704958, 61.084864909), x_dir=(0.7071607872065585, 0, -0.7070527710414553), z_dir=(0, -1, 0))) as fillet9_piece_1:
        with BuildLine():
            CenterArc((1.467808139, 0.947724847), FILLET9_R, 163.832706895, 87.559469258)
            Line((0.50735535, 1.22616773), (0.411310071, 1.254012019))
            ThreePointArc((0.411310071, 1.254012019), (-0.128444999, 0.101525163), (-0.070716079, -0.070705277))
            Line((-0.070716079, -0.070705277), (0.031908873, -0.094772485))
            ThreePointArc((0.031908873, -0.094772485), (0.574359707, -0.005904724), (1.116810541, -0.094772485))
            Line((1.116810541, -0.094772485), (1.148719413, 0))
        make_face()
    extrude(amount=1.92)
    with BuildSketch(Plane(origin=(48.3, -22.036704958, 61.149307734), x_dir=(0.6796864528804881, 0, -0.7335027782979013), z_dir=(0, 1, 0))) as fillet9_piece_2:
        with BuildLine():
            CenterArc((1.47787276, -0.959202562), FILLET9_R, 106.422593877, 87.559469258)
            Line((0.507501346, -1.200820688), (0.410464204, -1.2249825))
            ThreePointArc((0.410464204, -1.2249825), (0.208514231, -0.619528565), (-0.084953776, -0.052752781))
            Line((-0.084953776, -0.052752781), (-0.067968645, 0.073350278))
            ThreePointArc((-0.067968645, 0.073350278), (0.082768354, 0.137287787), (1.166881058, 0.095920256))
            Line((1.166881058, 0.095920256), (1.195153031, 0))
        make_face()
    extrude(amount=1.92)

    # Fillet10
    # the kernel refuses this fillet: 1 mm, written as the material it adds along each edge
    with BuildSketch(Plane(origin=(46.7, -20.116704958, 61.084864909), x_dir=(-0.7071607872063822, 0, -0.7070527710416314), z_dir=(0, -1, 0))) as fillet10_piece_1:
        with BuildLine():
            CenterArc((1.467808139, -0.947724847), FILLET10_R, 108.607823847, 87.559469258)
            Line((0.50735535, -1.22616773), (0.411310071, -1.254012019))
            ThreePointArc((0.411310071, -1.254012019), (-0.128444999, -0.101525163), (-0.070716079, 0.070705277))
            Line((-0.070716079, 0.070705277), (0.031908873, 0.094772485))
            ThreePointArc((0.031908873, 0.094772485), (0.574359707, 0.005904724), (1.116810541, 0.094772485))
            Line((1.116810541, 0.094772485), (1.148719413, 0))
        make_face()
    extrude(amount=1.92)
    with BuildSketch(Plane(origin=(46.7, -22.036704958, 61.149307734), x_dir=(-0.9402356634883816, 0, 0.3405244442100488), z_dir=(0, 1, 0))) as fillet10_piece_2:
        with BuildLine():
            CenterArc((1.458856994, -0.987883455), FILLET10_R, 98.92825383, 87.559469258)
            Line((0.465260905, -1.100873771), (0.365901296, -1.112172802))
            ThreePointArc((0.365901296, -1.112172802), (-0.094237007, -0.129683936), (-0.094023566, 0.034052444))
            Line((-0.094023566, 0.034052444), (0.015519755, 0.098788345))
            ThreePointArc((0.015519755, 0.098788345), (0.651829721, 0.049110509), (1.288139686, 0.098788345))
            Line((1.288139686, 0.098788345), (1.303659442, 0))
        make_face()
    extrude(amount=1.92)


solid = part.part
